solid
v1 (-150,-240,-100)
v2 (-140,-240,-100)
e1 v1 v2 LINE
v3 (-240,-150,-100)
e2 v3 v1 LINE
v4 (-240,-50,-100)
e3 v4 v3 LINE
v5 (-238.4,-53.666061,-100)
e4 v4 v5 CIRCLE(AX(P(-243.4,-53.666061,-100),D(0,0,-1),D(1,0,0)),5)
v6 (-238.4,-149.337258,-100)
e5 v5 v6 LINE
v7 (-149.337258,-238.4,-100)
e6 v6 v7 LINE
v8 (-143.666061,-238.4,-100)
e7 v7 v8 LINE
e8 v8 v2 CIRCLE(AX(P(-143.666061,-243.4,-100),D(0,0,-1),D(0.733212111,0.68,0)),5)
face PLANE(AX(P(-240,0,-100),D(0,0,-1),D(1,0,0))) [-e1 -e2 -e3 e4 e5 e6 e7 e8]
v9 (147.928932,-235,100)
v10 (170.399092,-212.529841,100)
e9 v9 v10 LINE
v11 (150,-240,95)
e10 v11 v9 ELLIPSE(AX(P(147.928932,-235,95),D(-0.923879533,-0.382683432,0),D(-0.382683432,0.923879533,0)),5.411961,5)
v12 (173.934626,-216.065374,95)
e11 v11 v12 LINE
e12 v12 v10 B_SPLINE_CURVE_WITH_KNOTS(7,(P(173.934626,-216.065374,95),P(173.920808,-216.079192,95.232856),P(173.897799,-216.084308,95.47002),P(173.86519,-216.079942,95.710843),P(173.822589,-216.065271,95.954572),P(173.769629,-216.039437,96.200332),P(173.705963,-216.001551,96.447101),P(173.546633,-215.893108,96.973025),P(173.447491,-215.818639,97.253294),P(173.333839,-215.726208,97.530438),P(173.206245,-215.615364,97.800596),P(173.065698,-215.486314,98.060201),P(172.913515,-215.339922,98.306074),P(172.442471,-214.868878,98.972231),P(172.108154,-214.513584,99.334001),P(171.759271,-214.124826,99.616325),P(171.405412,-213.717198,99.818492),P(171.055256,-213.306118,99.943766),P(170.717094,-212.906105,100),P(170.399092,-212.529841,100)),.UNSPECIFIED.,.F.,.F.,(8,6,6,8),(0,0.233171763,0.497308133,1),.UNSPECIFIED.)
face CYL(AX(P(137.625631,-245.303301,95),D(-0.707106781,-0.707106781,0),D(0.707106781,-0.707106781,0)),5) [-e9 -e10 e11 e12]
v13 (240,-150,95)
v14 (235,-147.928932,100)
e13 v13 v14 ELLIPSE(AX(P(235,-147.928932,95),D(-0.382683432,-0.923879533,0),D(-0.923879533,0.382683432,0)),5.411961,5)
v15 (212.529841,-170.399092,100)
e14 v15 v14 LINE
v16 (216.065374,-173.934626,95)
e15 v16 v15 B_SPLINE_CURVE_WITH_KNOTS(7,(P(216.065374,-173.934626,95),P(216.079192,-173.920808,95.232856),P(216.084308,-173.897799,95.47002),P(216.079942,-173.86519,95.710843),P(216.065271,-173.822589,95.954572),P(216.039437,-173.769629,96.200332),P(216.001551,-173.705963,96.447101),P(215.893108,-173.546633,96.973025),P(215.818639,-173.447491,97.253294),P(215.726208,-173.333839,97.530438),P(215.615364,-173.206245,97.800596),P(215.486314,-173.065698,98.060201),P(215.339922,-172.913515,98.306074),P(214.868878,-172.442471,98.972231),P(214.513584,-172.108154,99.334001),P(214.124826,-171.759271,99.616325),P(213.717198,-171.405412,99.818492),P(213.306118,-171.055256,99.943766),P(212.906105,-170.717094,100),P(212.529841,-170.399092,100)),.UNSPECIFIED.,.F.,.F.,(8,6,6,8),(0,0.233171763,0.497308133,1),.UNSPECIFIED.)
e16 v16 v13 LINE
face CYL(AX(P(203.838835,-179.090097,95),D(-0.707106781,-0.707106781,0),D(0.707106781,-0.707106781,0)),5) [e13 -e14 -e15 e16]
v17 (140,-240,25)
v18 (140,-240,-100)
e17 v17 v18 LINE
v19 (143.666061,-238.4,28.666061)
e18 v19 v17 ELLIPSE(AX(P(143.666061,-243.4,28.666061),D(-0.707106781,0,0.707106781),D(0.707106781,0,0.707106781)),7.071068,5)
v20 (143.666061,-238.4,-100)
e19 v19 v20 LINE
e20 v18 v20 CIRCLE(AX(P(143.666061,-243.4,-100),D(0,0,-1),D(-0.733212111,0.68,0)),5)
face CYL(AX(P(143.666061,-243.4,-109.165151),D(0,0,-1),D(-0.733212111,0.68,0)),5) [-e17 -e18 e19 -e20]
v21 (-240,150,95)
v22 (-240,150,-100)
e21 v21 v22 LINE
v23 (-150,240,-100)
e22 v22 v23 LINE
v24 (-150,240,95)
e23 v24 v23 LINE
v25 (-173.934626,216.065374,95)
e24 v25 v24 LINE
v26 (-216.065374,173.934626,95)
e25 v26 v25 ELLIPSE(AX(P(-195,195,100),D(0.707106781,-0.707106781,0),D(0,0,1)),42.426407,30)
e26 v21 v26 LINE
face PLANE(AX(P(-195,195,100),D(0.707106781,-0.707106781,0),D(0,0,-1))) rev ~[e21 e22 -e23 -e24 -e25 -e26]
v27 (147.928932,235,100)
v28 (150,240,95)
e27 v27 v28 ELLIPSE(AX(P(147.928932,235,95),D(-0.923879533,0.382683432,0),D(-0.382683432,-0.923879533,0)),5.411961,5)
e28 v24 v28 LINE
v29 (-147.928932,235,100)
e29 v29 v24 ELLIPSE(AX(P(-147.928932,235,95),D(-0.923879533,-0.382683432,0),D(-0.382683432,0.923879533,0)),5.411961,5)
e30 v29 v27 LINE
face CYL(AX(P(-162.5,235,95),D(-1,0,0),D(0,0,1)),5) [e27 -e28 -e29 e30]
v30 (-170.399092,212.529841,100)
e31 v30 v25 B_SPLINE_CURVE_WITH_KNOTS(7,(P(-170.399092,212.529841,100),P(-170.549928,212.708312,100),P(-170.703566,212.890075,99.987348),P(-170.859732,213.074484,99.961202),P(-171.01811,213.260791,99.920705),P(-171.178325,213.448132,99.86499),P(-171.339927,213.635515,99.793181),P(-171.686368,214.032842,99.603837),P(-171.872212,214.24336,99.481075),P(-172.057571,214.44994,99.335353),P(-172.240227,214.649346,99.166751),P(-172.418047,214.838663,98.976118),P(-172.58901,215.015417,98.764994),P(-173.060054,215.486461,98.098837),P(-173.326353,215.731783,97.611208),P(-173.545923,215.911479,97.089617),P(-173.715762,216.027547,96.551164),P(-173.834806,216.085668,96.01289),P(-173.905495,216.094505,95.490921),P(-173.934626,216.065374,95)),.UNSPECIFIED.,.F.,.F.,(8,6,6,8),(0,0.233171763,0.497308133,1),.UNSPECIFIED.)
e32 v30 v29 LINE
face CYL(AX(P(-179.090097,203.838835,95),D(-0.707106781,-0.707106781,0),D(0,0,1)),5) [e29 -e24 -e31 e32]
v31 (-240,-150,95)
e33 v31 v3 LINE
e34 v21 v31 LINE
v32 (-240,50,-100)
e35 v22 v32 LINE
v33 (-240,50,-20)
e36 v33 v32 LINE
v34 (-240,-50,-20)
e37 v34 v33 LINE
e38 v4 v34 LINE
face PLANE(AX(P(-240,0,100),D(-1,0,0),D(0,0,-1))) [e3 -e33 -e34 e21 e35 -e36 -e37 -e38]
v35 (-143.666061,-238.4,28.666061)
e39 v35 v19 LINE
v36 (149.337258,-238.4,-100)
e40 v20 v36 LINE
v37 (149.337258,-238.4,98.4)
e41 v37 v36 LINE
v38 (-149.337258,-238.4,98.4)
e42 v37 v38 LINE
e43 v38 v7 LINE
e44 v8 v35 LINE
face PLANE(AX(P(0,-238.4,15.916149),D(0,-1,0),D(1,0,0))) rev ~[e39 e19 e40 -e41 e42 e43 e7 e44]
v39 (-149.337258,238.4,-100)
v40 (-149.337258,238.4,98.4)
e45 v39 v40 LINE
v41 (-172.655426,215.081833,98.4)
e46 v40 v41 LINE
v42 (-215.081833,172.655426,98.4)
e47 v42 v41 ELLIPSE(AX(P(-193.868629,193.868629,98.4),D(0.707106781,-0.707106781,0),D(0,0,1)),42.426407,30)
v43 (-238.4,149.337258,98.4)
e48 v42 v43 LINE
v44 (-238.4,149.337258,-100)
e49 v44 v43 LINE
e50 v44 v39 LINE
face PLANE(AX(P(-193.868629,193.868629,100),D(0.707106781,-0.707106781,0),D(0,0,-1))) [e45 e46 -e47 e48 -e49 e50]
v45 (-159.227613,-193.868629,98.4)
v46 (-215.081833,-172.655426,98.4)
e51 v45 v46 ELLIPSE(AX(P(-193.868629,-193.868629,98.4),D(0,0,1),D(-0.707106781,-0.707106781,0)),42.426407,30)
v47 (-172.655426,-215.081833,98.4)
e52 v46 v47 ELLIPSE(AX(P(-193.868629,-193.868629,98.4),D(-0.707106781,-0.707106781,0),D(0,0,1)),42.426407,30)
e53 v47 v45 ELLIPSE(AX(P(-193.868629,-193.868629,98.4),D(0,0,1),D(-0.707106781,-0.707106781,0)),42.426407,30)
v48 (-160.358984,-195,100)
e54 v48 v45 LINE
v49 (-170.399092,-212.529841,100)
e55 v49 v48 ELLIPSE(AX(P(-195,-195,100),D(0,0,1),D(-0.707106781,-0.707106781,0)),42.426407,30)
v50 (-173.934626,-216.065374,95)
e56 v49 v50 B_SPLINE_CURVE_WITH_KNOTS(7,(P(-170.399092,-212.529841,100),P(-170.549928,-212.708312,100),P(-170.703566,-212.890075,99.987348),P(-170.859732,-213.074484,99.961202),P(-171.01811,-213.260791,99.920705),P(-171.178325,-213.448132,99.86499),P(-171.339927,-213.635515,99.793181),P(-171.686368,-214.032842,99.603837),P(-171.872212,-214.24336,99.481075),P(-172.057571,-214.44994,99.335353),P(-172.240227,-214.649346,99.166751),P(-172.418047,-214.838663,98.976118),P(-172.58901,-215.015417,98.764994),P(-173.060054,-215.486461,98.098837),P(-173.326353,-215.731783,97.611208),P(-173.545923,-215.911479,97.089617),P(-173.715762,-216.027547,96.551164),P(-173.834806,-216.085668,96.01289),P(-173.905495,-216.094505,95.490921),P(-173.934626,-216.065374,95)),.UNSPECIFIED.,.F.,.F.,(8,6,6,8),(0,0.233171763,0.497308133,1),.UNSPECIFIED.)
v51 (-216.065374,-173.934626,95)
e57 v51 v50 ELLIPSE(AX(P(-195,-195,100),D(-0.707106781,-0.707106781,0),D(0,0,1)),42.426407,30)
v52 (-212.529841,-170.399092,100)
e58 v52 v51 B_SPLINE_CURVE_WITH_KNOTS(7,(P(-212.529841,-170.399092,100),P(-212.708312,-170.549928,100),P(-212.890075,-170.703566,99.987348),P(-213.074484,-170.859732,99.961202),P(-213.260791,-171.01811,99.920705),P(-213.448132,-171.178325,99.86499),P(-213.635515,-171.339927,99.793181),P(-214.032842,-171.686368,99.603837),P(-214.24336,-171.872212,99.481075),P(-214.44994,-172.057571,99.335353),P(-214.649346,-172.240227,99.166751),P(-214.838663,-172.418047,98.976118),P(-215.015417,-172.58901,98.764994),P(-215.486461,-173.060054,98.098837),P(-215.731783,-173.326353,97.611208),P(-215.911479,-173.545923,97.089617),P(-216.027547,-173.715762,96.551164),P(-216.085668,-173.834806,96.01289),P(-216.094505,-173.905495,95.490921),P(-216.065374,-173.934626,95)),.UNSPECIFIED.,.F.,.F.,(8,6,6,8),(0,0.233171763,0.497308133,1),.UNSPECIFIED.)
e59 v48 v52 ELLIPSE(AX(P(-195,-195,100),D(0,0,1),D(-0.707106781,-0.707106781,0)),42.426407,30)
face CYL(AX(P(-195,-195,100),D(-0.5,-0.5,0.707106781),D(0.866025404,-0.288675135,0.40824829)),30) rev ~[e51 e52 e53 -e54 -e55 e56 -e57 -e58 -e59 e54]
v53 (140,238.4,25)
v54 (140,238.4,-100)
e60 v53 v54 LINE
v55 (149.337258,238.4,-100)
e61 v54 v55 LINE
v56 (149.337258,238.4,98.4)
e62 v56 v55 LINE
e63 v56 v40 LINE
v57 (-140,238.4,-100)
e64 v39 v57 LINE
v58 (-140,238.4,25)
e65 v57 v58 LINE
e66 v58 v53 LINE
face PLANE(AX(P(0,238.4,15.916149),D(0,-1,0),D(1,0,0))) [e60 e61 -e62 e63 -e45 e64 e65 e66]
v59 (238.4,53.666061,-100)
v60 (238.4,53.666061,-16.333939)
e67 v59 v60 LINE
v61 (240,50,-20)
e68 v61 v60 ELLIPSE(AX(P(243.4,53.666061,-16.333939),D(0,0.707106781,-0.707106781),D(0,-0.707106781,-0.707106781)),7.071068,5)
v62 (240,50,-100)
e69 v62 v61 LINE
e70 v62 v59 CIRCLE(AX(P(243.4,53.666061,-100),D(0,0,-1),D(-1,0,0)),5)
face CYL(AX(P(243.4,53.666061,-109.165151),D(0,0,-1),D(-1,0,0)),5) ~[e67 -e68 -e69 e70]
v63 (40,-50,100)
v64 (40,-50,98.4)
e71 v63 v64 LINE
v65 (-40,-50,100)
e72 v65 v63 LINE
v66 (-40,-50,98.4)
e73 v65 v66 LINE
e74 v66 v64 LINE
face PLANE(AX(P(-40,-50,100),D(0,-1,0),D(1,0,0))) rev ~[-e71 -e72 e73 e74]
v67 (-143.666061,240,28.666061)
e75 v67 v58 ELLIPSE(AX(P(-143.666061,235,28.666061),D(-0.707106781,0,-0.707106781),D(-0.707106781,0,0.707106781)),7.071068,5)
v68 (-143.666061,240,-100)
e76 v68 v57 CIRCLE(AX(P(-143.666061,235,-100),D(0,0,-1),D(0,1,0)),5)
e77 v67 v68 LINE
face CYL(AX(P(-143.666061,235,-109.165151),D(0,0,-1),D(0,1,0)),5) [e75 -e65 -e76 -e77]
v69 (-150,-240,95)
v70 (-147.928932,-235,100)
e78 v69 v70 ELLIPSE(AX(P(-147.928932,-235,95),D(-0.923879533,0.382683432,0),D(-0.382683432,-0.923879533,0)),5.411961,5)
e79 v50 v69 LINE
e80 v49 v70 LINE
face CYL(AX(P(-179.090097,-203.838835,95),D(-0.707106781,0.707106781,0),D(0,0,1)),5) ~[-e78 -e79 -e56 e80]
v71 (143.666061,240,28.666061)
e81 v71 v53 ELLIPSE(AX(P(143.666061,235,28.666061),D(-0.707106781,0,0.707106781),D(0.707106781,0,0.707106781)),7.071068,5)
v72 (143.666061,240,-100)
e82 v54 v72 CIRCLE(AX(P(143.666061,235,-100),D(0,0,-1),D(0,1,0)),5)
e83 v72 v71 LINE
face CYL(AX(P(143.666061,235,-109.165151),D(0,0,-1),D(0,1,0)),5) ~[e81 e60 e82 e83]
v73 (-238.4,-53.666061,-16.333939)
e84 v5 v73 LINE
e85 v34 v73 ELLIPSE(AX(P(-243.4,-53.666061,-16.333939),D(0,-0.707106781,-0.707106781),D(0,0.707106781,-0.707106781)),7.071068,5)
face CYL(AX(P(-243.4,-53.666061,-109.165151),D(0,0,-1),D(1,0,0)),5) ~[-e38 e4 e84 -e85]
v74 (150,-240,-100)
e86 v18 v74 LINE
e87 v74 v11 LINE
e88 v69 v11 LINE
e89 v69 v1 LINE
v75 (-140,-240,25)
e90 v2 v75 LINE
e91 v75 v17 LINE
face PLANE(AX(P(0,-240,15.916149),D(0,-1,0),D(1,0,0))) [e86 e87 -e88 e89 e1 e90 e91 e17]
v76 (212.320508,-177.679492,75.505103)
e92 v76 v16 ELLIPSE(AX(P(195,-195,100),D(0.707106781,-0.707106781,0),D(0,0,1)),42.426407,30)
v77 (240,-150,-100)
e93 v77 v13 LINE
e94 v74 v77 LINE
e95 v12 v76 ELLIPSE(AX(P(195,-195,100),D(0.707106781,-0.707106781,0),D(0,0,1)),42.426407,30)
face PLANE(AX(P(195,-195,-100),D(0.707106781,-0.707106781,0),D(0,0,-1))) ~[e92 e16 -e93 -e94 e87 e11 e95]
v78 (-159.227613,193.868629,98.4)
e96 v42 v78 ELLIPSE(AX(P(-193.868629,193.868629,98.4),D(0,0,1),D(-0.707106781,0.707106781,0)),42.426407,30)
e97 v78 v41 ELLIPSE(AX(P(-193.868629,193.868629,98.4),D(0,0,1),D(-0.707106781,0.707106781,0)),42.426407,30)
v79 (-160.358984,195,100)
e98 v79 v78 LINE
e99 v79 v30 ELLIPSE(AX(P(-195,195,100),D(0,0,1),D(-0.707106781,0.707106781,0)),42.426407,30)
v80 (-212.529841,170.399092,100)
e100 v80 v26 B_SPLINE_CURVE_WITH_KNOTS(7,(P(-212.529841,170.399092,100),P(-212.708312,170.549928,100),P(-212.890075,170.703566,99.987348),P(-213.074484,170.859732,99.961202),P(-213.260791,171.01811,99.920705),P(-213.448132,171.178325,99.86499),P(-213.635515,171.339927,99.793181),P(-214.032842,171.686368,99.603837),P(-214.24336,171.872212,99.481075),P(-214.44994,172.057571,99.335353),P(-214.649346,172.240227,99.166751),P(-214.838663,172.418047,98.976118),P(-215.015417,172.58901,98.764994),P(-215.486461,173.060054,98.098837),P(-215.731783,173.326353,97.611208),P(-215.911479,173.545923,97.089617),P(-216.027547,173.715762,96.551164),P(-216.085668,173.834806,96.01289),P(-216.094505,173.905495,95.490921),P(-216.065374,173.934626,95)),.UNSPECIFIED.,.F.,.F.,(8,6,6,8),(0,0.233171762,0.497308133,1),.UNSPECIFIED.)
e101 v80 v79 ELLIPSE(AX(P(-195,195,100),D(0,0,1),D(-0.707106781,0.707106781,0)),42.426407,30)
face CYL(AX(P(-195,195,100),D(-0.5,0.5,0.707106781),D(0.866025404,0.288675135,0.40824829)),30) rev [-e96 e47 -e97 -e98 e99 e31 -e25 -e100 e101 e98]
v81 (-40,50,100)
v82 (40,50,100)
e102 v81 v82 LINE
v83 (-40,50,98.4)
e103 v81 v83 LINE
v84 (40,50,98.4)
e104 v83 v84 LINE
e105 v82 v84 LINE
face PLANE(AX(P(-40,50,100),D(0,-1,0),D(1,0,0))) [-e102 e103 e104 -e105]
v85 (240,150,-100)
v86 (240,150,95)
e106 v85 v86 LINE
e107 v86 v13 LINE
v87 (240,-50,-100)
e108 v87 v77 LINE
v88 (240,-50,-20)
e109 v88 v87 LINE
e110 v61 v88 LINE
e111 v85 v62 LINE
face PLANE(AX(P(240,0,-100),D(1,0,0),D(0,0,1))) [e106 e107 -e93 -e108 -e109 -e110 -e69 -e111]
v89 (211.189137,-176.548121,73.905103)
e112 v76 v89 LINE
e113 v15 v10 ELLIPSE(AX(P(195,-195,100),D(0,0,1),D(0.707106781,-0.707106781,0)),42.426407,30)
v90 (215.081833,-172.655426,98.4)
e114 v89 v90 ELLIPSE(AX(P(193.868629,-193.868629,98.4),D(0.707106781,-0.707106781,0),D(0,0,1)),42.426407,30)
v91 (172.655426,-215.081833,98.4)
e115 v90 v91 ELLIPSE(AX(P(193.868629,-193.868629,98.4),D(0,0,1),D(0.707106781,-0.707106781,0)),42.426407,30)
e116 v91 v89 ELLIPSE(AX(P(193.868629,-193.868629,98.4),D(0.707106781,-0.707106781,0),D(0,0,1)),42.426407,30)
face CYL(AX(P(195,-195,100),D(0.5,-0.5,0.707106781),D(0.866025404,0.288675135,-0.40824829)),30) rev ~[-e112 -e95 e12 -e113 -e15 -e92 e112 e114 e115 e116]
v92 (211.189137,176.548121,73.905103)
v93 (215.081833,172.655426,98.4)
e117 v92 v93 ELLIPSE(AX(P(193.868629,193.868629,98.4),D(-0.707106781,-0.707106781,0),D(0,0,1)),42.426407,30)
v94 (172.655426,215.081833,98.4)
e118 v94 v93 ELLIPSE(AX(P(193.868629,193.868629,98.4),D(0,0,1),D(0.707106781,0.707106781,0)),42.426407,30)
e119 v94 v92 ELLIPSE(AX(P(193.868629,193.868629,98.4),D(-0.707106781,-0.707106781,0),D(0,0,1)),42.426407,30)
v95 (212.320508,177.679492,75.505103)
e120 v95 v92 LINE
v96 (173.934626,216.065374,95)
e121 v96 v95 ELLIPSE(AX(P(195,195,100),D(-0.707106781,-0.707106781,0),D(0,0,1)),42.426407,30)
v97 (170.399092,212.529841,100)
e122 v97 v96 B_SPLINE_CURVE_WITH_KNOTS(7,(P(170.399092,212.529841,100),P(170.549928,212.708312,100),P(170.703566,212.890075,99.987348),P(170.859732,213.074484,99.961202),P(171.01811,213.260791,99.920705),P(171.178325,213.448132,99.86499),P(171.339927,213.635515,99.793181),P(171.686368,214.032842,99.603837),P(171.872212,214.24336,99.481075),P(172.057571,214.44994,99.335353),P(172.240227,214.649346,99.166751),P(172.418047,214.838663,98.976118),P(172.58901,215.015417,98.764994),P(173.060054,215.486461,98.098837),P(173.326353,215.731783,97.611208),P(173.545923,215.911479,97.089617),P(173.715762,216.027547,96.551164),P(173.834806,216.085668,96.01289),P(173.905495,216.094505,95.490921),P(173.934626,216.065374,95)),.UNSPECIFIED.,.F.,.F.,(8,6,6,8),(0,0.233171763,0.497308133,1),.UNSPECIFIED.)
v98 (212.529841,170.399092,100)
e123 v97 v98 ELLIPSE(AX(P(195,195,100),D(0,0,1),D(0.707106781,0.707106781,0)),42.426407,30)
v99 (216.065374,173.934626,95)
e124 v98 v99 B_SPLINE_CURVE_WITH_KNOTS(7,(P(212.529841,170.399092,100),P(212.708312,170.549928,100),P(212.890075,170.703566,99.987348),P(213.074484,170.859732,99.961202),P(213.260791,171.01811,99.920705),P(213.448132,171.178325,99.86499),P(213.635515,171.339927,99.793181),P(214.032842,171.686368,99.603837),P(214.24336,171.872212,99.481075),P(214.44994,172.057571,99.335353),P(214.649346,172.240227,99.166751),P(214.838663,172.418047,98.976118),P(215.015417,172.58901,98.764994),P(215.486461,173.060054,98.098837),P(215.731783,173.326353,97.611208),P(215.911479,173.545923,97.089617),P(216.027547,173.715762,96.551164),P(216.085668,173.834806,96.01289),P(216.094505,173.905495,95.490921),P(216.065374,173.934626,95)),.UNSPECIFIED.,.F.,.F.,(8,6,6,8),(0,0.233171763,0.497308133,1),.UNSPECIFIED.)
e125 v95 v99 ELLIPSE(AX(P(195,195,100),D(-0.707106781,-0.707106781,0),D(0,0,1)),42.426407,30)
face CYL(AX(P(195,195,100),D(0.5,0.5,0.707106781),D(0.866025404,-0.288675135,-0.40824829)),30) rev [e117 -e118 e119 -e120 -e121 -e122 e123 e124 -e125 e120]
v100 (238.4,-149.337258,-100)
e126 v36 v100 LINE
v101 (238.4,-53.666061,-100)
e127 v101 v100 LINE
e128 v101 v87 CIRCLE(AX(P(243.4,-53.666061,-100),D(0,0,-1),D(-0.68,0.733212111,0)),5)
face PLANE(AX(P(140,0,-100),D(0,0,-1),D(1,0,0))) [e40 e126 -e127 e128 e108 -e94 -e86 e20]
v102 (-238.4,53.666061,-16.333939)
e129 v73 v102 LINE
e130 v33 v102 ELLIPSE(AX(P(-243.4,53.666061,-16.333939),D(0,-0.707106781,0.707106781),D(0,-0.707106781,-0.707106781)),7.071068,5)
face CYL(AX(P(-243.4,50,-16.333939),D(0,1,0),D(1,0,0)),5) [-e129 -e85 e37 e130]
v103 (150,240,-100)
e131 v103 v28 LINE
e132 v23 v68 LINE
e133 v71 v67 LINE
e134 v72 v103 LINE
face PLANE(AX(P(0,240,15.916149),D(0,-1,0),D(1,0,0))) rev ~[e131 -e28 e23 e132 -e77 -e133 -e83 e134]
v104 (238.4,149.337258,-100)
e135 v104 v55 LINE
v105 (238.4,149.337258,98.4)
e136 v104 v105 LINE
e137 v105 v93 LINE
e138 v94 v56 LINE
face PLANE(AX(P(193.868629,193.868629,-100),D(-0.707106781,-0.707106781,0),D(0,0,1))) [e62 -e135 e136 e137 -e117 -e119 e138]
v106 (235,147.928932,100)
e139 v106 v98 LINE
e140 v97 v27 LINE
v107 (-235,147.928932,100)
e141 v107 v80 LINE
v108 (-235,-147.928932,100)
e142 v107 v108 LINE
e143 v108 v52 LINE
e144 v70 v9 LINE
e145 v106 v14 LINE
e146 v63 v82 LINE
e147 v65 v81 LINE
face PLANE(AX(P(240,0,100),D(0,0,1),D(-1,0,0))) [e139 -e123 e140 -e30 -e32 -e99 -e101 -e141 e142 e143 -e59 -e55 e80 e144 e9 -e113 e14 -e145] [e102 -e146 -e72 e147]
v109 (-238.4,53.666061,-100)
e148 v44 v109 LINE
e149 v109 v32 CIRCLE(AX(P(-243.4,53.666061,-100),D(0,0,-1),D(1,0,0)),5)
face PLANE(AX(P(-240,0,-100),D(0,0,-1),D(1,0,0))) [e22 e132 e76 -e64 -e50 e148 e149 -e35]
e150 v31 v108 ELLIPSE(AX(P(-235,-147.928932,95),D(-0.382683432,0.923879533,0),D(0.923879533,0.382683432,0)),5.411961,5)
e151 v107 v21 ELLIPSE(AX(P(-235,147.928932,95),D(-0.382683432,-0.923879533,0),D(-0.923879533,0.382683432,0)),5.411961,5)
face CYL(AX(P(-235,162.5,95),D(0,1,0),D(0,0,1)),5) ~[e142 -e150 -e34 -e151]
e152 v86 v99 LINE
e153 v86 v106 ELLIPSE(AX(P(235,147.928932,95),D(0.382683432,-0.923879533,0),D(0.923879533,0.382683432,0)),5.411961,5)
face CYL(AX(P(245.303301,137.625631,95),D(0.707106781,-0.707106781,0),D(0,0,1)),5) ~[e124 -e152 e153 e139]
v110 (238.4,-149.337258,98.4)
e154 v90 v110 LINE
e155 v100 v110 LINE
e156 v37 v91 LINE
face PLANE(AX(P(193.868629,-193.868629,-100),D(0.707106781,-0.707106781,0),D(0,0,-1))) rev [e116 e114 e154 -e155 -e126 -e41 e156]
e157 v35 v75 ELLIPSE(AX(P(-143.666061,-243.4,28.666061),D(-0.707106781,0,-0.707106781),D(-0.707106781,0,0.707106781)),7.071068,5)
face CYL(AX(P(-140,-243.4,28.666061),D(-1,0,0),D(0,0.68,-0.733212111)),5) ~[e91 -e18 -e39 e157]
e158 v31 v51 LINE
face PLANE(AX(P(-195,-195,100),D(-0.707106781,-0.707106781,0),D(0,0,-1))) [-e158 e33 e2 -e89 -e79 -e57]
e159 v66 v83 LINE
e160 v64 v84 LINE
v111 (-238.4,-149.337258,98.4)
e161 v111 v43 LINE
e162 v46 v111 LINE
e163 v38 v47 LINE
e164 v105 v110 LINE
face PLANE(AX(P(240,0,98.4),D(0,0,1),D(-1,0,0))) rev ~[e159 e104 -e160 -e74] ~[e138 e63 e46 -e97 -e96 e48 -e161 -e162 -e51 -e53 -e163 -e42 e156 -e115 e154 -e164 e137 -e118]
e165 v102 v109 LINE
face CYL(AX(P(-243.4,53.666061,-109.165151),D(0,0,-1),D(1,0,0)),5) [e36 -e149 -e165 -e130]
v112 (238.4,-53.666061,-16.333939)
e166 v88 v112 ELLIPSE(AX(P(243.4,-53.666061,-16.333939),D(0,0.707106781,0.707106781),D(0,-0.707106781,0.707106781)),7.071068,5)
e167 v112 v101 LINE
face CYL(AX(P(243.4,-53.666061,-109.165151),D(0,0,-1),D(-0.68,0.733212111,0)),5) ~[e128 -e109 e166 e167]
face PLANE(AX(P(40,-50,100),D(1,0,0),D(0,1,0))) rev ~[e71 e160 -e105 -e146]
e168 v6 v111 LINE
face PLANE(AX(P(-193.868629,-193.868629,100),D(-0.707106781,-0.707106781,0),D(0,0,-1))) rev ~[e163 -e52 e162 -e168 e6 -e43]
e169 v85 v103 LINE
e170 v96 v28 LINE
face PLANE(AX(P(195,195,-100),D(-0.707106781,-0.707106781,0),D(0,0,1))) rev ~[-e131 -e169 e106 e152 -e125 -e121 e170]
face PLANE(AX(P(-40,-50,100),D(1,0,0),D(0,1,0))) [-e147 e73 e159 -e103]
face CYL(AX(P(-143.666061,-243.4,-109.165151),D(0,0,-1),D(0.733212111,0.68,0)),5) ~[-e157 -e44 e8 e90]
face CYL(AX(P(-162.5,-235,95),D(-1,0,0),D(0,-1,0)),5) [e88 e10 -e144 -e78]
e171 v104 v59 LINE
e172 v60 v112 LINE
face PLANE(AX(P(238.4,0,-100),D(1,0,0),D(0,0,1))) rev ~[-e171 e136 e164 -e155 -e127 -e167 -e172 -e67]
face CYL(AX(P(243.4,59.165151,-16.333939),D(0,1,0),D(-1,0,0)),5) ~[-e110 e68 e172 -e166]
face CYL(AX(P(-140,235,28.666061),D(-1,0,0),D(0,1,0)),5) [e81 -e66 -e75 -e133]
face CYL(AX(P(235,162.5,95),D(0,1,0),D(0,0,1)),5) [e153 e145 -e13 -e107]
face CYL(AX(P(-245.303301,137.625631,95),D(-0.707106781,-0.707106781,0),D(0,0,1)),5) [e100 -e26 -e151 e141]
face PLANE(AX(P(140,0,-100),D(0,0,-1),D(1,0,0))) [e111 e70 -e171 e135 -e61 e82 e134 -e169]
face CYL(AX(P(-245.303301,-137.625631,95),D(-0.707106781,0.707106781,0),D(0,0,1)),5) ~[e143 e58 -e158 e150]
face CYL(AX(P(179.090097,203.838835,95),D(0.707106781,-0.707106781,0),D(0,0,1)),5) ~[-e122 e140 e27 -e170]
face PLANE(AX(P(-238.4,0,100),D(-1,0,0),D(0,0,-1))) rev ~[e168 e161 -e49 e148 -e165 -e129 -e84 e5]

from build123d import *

# Parameters (mm, degrees)
F1_DEPTH       = 240
F2_SIZE        = 90
F3_T           = -1.6
F10_R          = 30
F12_DEPTH      = 78
F11_R          = 30
F13_DEPTH      = 82
F8_R           = 30
F14_DEPTH      = 153
F9_R           = 30
F15_DEPTH      = 141
F17_DEPTH      = 688
F18_W          = 80
F18_H          = 100
F19_DEPTH      = 25
F20_T1_DEPTH   = 325
F20_T3_DEPTH   = 58.6396103068
F20_T5_DEPTH   = 58.6396103068
F20_T7_DEPTH   = 58.6396103068
F20_T9_DEPTH   = 58.6396103068
F20_T11_DEPTH  = 325
F20_T13_DEPTH  = 58.6396103068
F20_T15_DEPTH  = 58.6396103068
F20_T17_DEPTH  = 134.1651513899
F20_T19_DEPTH  = 280
F20_T21_DEPTH  = 89.1651513899
F20_T23_DEPTH  = 100
F20_T29_DEPTH  = 134.1651513899
F20_T33_DEPTH  = 289.1651513899
F20_T40_DEPTH  = 289.1651513899
F20_T44_DEPTH  = 134.1651513899
F20_T51_DEPTH  = 89.1651513899
F20_T55_DEPTH  = 109.1651513899
F20_T62_DEPTH  = 109.1651513899
F20_T66_DEPTH  = 89.1651513899
F20_T73_DEPTH  = 89.1651513899
F20_T77_DEPTH  = 109.1651513899
F20_T84_DEPTH  = 89.1651513899
F20_T88_DEPTH  = 109.1651513899
F20_T95_DEPTH  = 289.1651513899
F20_T99_DEPTH  = 134.1651513899
F20_T106_DEPTH = 134.1651513899
F20_T110_DEPTH = 289.1651513899


# Not quite as in the source:
# - a fillet or chamfer that OpenCascade refuses, or shapes differently, is made with other operations: its cross-section is extruded or revolved along the edge and cut away or added


with BuildPart() as f1:
    # F0 (on Front) → F1 (new body, symmetric)
    with BuildSketch(Plane.XZ):
        Polygon((140, -100), (240, -100), (240, 100), (-240, 100), (-240, -100), (-140, -100), (-140, 25), (140, 25), align=None)
    extrude(amount=F1_DEPTH, both=True)

    # F2
    f2_edges = [f1.edges().sort_by_distance(p)[0] for p in [
        (240, -240, 0),
        (240, 240, 0),
        (-240, 240, 0),
        (-240, -240, 0),
    ]]
    chamfer(f2_edges, length=F2_SIZE)

    # F3
    f3_openings = [f1.faces().sort_by_distance(p)[0] for p in [
        (185.93985, 0, -100),
        (-185.93985, 0, -100),
        (0, 0, 25),
        (140, 0, -37.5),
        (-140, 0, -37.5),
    ]]
    offset(amount=F3_T, openings=f3_openings)

    # F10 (on face) → F12 (cut)
    with BuildSketch(Plane(origin=(-132.8553390593, 132.8553390593, 187.8858223314), x_dir=(0.8660254038, 0.2886751346, 0.4082482905), z_dir=(0.5, -0.5, -0.7071067812))):
        with Locations((-71.7584734456, -101.4818063619)):
            Circle(F10_R)
    extrude(amount=F12_DEPTH, mode=Mode.SUBTRACT)

    # F11 (on face) → F13 (cut)
    with BuildSketch(Plane(origin=(-132.8553390593, -132.8553390593, 187.8858223314), x_dir=(0.8660254038, -0.2886751346, 0.4082482905), z_dir=(-0.5, -0.5, 0.7071067812))):
        with Locations((-71.7584734456, -101.4818063619)):
            Circle(F11_R)
    extrude(amount=-F13_DEPTH, mode=Mode.SUBTRACT)

    # F8 (on face) → F14 (cut)
    with BuildSketch(Plane(origin=(132.8553390593, -132.8553390593, 187.8858223314), x_dir=(0.8660254038, 0.2886751346, -0.4082482905), z_dir=(0.5, -0.5, 0.7071067812))):
        with Locations((71.7584734456, -101.4818063619)):
            Circle(F8_R)
    extrude(amount=-F14_DEPTH, mode=Mode.SUBTRACT)

    # F9 (on face) → F15 (cut)
    with BuildSketch(Plane(origin=(132.8553390593, 132.8553390593, 187.8858223314), x_dir=(0.8660254038, -0.2886751346, -0.4082482905), z_dir=(-0.5, -0.5, -0.7071067812))):
        with Locations((71.7584734456, -101.4818063619)):
            Circle(F9_R)
    extrude(amount=F15_DEPTH, mode=Mode.SUBTRACT)

    # F16 (on face) → F17 (cut)
    with BuildSketch(Plane(origin=(-240, 0, 0), x_dir=(0, -1, 0), z_dir=(-1, 0, 0))):
        Polygon((-50, -20), (-50, -100), (0, -100), (50, -100), (50, -20), align=None)
    extrude(amount=-F17_DEPTH, mode=Mode.SUBTRACT)

    # F18 (on face) → F19 (cut)
    with BuildSketch(Plane.XY.offset(100)):
        Rectangle(F18_W, F18_H)
    extrude(amount=-F19_DEPTH, mode=Mode.SUBTRACT)

    # F20: fillet of radius 5 on 24 edges, made by hand

    # F20_s2 → F20_t1 (cut)
    with BuildSketch(Plane.YZ.offset(-162.5)):
        with BuildLine():
            ThreePointArc((235, 100), (238.5355339059, 98.5355339059), (240, 95))
            Line((240, 95), (240, 100))
            Line((240, 100), (235, 100))
        make_face()
        with BuildLine():
            ThreePointArc((-240, 95), (-238.5355339059, 98.5355339059), (-235, 100))
            Line((-235, 100), (-240, 100))
            Line((-240, 100), (-240, 95))
        make_face()
    extrude(amount=F20_T1_DEPTH, mode=Mode.SUBTRACT)

    # F20_s4 → F20_t3 (cut)
    with BuildSketch(Plane(origin=(12.3743686708, 12.3743686708, 0), x_dir=(0, 0, 1), z_dir=(0.7071067812, 0.7071067812, 0))):
        with BuildLine():
            ThreePointArc((100, -270.7716446628), (98.5355339059, -274.3071785687), (95, -275.7716446628))
            Line((95, -275.7716446628), (100, -275.7716446628))
            Line((100, -275.7716446628), (100, -270.7716446628))
        make_face()
        with BuildLine():
            ThreePointArc((95, 275.7716446628), (98.5355339059, 274.3071785687), (100, 270.7716446628))
            Line((100, 270.7716446628), (100, 275.7716446628))
            Line((100, 275.7716446628), (95, 275.7716446628))
        make_face()
    extrude(amount=F20_T3_DEPTH, mode=Mode.SUBTRACT)

    # F20_s6 → F20_t5 (cut)
    with BuildSketch(Plane(origin=(-12.3743686708, 12.3743686708, 0), x_dir=(0, 0, 1), z_dir=(-0.7071067812, 0.7071067812, 0))):
        with BuildLine():
            ThreePointArc((100, 270.7716446628), (98.5355339059, 274.3071785687), (95, 275.7716446628))
            Line((95, 275.7716446628), (100, 275.7716446628))
            Line((100, 275.7716446628), (100, 270.7716446628))
        make_face()
    extrude(amount=F20_T5_DEPTH, mode=Mode.SUBTRACT)

    # F20_s8 → F20_t7 (cut)
    with BuildSketch(Plane(origin=(53.8388347648, -53.8388347648, 0), x_dir=(0, 0, 1), z_dir=(-0.7071067812, 0.7071067812, 0))):
        with BuildLine():
            ThreePointArc((100, 270.7716446628), (98.5355339059, 274.3071785687), (95, 275.7716446628))
            Line((95, 275.7716446628), (100, 275.7716446628))
            Line((100, 275.7716446628), (100, 270.7716446628))
        make_face()
    extrude(amount=F20_T7_DEPTH, mode=Mode.SUBTRACT)

    # F20_s10 → F20_t9 (cut)
    with BuildSketch(Plane(origin=(-53.8388347648, -53.8388347648, 0), x_dir=(0, 0, 1), z_dir=(0.7071067812, 0.7071067812, 0))):
        with BuildLine():
            ThreePointArc((100, -270.7716446628), (98.5355339059, -274.3071785687), (95, -275.7716446628))
            Line((95, -275.7716446628), (100, -275.7716446628))
            Line((100, -275.7716446628), (100, -270.7716446628))
        make_face()
        with BuildLine():
            ThreePointArc((95, 275.7716446628), (98.5355339059, 274.3071785687), (100, 270.7716446628))
            Line((100, 270.7716446628), (100, 275.7716446628))
            Line((100, 275.7716446628), (95, 275.7716446628))
        make_face()
    extrude(amount=F20_T9_DEPTH, mode=Mode.SUBTRACT)

    # F20_s12 → F20_t11 (cut)
    with BuildSketch(Plane.XZ.offset(-162.5)):
        with BuildLine():
            ThreePointArc((-235, 100), (-238.5355339059, 98.5355339059), (-240, 95))
            Line((-240, 95), (-240, 100))
            Line((-240, 100), (-235, 100))
        make_face()
        with BuildLine():
            ThreePointArc((235, 100), (238.5355339059, 98.5355339059), (240, 95))
            Line((240, 95), (240, 100))
            Line((240, 100), (235, 100))
        make_face()
    extrude(amount=F20_T11_DEPTH, mode=Mode.SUBTRACT)

    # F20_s14 → F20_t13 (cut)
    with BuildSketch(Plane(origin=(-53.8388347648, 53.8388347648, 0), x_dir=(0, 0, 1), z_dir=(0.7071067812, -0.7071067812, 0))):
        with BuildLine():
            ThreePointArc((100, 270.7716446628), (98.5355339059, 274.3071785687), (95, 275.7716446628))
            Line((95, 275.7716446628), (100, 275.7716446628))
            Line((100, 275.7716446628), (100, 270.7716446628))
        make_face()
    extrude(amount=F20_T13_DEPTH, mode=Mode.SUBTRACT)

    # F20_s16 → F20_t15 (cut)
    with BuildSketch(Plane(origin=(12.3743686708, -12.3743686708, 0), x_dir=(0, 0, 1), z_dir=(0.7071067812, -0.7071067812, 0))):
        with BuildLine():
            ThreePointArc((100, 270.7716446628), (98.5355339059, 274.3071785687), (95, 275.7716446628))
            Line((95, 275.7716446628), (100, 275.7716446628))
            Line((100, 275.7716446628), (100, 270.7716446628))
        make_face()
    extrude(amount=F20_T15_DEPTH, mode=Mode.SUBTRACT)

    # F20_s18 → F20_t17 (cut)
    with BuildSketch(Plane.XY.offset(-109.1651513899)):
        with BuildLine():
            ThreePointArc((140, -240), (141.666060556, -238.817424305), (143.666060556, -238.4))
            Line((143.666060556, -238.4), (140, -238.4))
            Line((140, -238.4), (140, -240))
        make_face()
        with BuildLine():
            ThreePointArc((-140, -240), (-141.666060556, -238.817424305), (-143.666060556, -238.4))
            Line((-143.666060556, -238.4), (-140, -238.4))
            Line((-140, -238.4), (-140, -240))
        make_face()
        with BuildLine():
            ThreePointArc((143.666060556, 240), (141.666060556, 239.582575695), (140, 238.4))
            Line((140, 238.4), (140, 240))
            Line((140, 240), (143.666060556, 240))
        make_face()
        with BuildLine():
            ThreePointArc((-143.666060556, 240), (-141.666060556, 239.582575695), (-140, 238.4))
            Line((-140, 238.4), (-140, 240))
            Line((-140, 240), (-143.666060556, 240))
        make_face()
    extrude(amount=F20_T17_DEPTH, mode=Mode.SUBTRACT)

    # F20_s20 → F20_t19 (cut)
    with BuildSketch(Plane.YZ.offset(-140)):
        with BuildLine():
            ThreePointArc((-240, 25), (-238.817424305, 26.666060556), (-238.4, 28.666060556))
            Line((-238.4, 28.666060556), (-238.4, 25))
            Line((-238.4, 25), (-240, 25))
        make_face()
        with BuildLine():
            ThreePointArc((240, 28.666060556), (239.582575695, 26.666060556), (238.4, 25))
            Line((238.4, 25), (240, 25))
            Line((240, 25), (240, 28.666060556))
        make_face()
    extrude(amount=F20_T19_DEPTH, mode=Mode.SUBTRACT)

    # F20_s22 → F20_t21 (cut)
    with BuildSketch(Plane.XY.offset(-109.1651513899)):
        with BuildLine():
            ThreePointArc((-238.4, -53.666060556), (-238.817424305, -51.666060556), (-240, -50))
            Line((-240, -50), (-238.4, -50))
            Line((-238.4, -50), (-238.4, -53.666060556))
        make_face()
        with BuildLine():
            ThreePointArc((-238.4, 53.666060556), (-238.817424305, 51.666060556), (-240, 50))
            Line((-240, 50), (-238.4, 50))
            Line((-238.4, 50), (-238.4, 53.666060556))
        make_face()
        with BuildLine():
            ThreePointArc((240, -50), (238.817424305, -51.666060556), (238.4, -53.666060556))
            Line((238.4, -53.666060556), (238.4, -50))
            Line((238.4, -50), (240, -50))
        make_face()
        with BuildLine():
            ThreePointArc((238.4, 53.666060556), (238.817424305, 51.666060556), (240, 50))
            Line((240, 50), (238.4, 50))
            Line((238.4, 50), (238.4, 53.666060556))
        make_face()
    extrude(amount=F20_T21_DEPTH, mode=Mode.SUBTRACT)

    # F20_s24 → F20_t23 (cut)
    with BuildSketch(Plane.XZ.offset(-50)):
        with BuildLine():
            ThreePointArc((-238.4, -16.333939444), (-238.817424305, -18.333939444), (-240, -20))
            Line((-240, -20), (-238.4, -20))
            Line((-238.4, -20), (-238.4, -16.333939444))
        make_face()
        with BuildLine():
            ThreePointArc((238.4, -16.333939444), (238.817424305, -18.333939444), (240, -20))
            Line((240, -20), (238.4, -20))
            Line((238.4, -20), (238.4, -16.333939444))
        make_face()
    extrude(amount=F20_T23_DEPTH, mode=Mode.SUBTRACT)


with BuildPart() as f20_tool27:
    # F20_s28 → F20_t29 (new body)
    with BuildSketch(Plane.XY.offset(34.1651513899)):
        with BuildLine():
            ThreePointArc((140, -240), (141.666060556, -238.817424305), (143.666060556, -238.4))
            Line((143.666060556, -238.4), (140, -238.4))
            Line((140, -238.4), (140, -240))
        make_face()
    extrude(amount=-F20_T29_DEPTH)

    split(bisect_by=Plane.XY.offset(25), keep=Keep.TOP)


with BuildPart() as f20_tool31:
    # F20_s32 → F20_t33 (new body)
    with BuildSketch(Plane.YZ.offset(-140)):
        with BuildLine():
            ThreePointArc((-240, 25), (-238.817424305, 26.666060556), (-238.4, 28.666060556))
            Line((-238.4, 28.666060556), (-238.4, 25))
            Line((-238.4, 25), (-240, 25))
        make_face()
    extrude(amount=F20_T33_DEPTH)

    split(bisect_by=Plane.YZ.offset(140), keep=Keep.TOP)


with BuildPart() as f20_tool27_1:
    add(f20_tool27.part)

    # F20_t35: intersect F20_tool31
    add(f20_tool31.part, mode=Mode.INTERSECT)


with BuildPart() as f1_1:
    add(f1.part)

    # F20_t25: cut F20_tool27
    add(f20_tool27_1.part, mode=Mode.SUBTRACT)


with BuildPart() as f20_tool38:
    # F20_s39 → F20_t40 (new body)
    with BuildSketch(Plane.YZ.offset(-149.1651513899)):
        with BuildLine():
            ThreePointArc((-240, 25), (-238.817424305, 26.666060556), (-238.4, 28.666060556))
            Line((-238.4, 28.666060556), (-238.4, 25))
            Line((-238.4, 25), (-240, 25))
        make_face()
    extrude(amount=F20_T40_DEPTH)

    split(bisect_by=Plane.YZ.offset(-140), keep=Keep.BOTTOM)


with BuildPart() as f20_tool42:
    # F20_s43 → F20_t44 (new body)
    with BuildSketch(Plane.XY.offset(-100)):
        with BuildLine():
            ThreePointArc((-140, -240), (-141.666060556, -238.817424305), (-143.666060556, -238.4))
            Line((-143.666060556, -238.4), (-140, -238.4))
            Line((-140, -238.4), (-140, -240))
        make_face()
    extrude(amount=F20_T44_DEPTH)

    split(bisect_by=Plane.XY.offset(25), keep=Keep.TOP)


with BuildPart() as f20_tool38_1:
    add(f20_tool38.part)

    # F20_t46: intersect F20_tool42
    add(f20_tool42.part, mode=Mode.INTERSECT)


with BuildPart() as f1_2:
    add(f1_1.part)

    # F20_t36: cut F20_tool38
    add(f20_tool38_1.part, mode=Mode.SUBTRACT)


with BuildPart() as f20_tool49:
    # F20_s50 → F20_t51 (new body)
    with BuildSketch(Plane.XY.offset(-100)):
        with BuildLine():
            ThreePointArc((-238.4, -53.666060556), (-238.817424305, -51.666060556), (-240, -50))
            Line((-240, -50), (-238.4, -50))
            Line((-238.4, -50), (-238.4, -53.666060556))
        make_face()
    extrude(amount=F20_T51_DEPTH)

    split(bisect_by=Plane.XY.offset(-20), keep=Keep.TOP)


with BuildPart() as f20_tool53:
    # F20_s54 → F20_t55 (new body)
    with BuildSketch(Plane.XZ.offset(59.1651513899)):
        with BuildLine():
            ThreePointArc((-238.4, -16.333939444), (-238.817424305, -18.333939444), (-240, -20))
            Line((-240, -20), (-238.4, -20))
            Line((-238.4, -20), (-238.4, -16.333939444))
        make_face()
    extrude(amount=-F20_T55_DEPTH)

    split(bisect_by=Plane.XZ.offset(50), keep=Keep.TOP)


with BuildPart() as f20_tool49_1:
    add(f20_tool49.part)

    # F20_t57: intersect F20_tool53
    add(f20_tool53.part, mode=Mode.INTERSECT)


with BuildPart() as f1_3:
    add(f1_2.part)

    # F20_t47: cut F20_tool49
    add(f20_tool49_1.part, mode=Mode.SUBTRACT)


with BuildPart() as f20_tool60:
    # F20_s61 → F20_t62 (new body)
    with BuildSketch(Plane.XZ.offset(50)):
        with BuildLine():
            ThreePointArc((-238.4, -16.333939444), (-238.817424305, -18.333939444), (-240, -20))
            Line((-240, -20), (-238.4, -20))
            Line((-238.4, -20), (-238.4, -16.333939444))
        make_face()
    extrude(amount=-F20_T62_DEPTH)

    split(bisect_by=Plane.XZ.offset(-50), keep=Keep.BOTTOM)


with BuildPart() as f20_tool64:
    # F20_s65 → F20_t66 (new body)
    with BuildSketch(Plane.XY.offset(-10.8348486101)):
        with BuildLine():
            ThreePointArc((-238.4, 53.666060556), (-238.817424305, 51.666060556), (-240, 50))
            Line((-240, 50), (-238.4, 50))
            Line((-238.4, 50), (-238.4, 53.666060556))
        make_face()
    extrude(amount=-F20_T66_DEPTH)

    split(bisect_by=Plane.XY.offset(-20), keep=Keep.TOP)


with BuildPart() as f20_tool60_1:
    add(f20_tool60.part)

    # F20_t68: intersect F20_tool64
    add(f20_tool64.part, mode=Mode.INTERSECT)


with BuildPart() as f1_4:
    add(f1_3.part)

    # F20_t58: cut F20_tool60
    add(f20_tool60_1.part, mode=Mode.SUBTRACT)


with BuildPart() as f20_tool71:
    # F20_s72 → F20_t73 (new body)
    with BuildSketch(Plane.XY.offset(-10.8348486101)):
        with BuildLine():
            ThreePointArc((240, -50), (238.817424305, -51.666060556), (238.4, -53.666060556))
            Line((238.4, -53.666060556), (238.4, -50))
            Line((238.4, -50), (240, -50))
        make_face()
    extrude(amount=-F20_T73_DEPTH)

    split(bisect_by=Plane.XY.offset(-20), keep=Keep.TOP)


with BuildPart() as f20_tool75:
    # F20_s76 → F20_t77 (new body)
    with BuildSketch(Plane.XZ.offset(-50)):
        with BuildLine():
            ThreePointArc((238.4, -16.333939444), (238.817424305, -18.333939444), (240, -20))
            Line((240, -20), (238.4, -20))
            Line((238.4, -20), (238.4, -16.333939444))
        make_face()
    extrude(amount=F20_T77_DEPTH)

    split(bisect_by=Plane.XZ.offset(50), keep=Keep.TOP)


with BuildPart() as f20_tool71_1:
    add(f20_tool71.part)

    # F20_t79: intersect F20_tool75
    add(f20_tool75.part, mode=Mode.INTERSECT)


with BuildPart() as f1_5:
    add(f1_4.part)

    # F20_t69: cut F20_tool71
    add(f20_tool71_1.part, mode=Mode.SUBTRACT)


with BuildPart() as f20_tool82:
    # F20_s83 → F20_t84 (new body)
    with BuildSketch(Plane.XY.offset(-100)):
        with BuildLine():
            ThreePointArc((238.4, 53.666060556), (238.817424305, 51.666060556), (240, 50))
            Line((240, 50), (238.4, 50))
            Line((238.4, 50), (238.4, 53.666060556))
        make_face()
    extrude(amount=F20_T84_DEPTH)

    split(bisect_by=Plane.XY.offset(-20), keep=Keep.TOP)


with BuildPart() as f20_tool86:
    # F20_s87 → F20_t88 (new body)
    with BuildSketch(Plane.XZ.offset(-59.1651513899)):
        with BuildLine():
            ThreePointArc((238.4, -16.333939444), (238.817424305, -18.333939444), (240, -20))
            Line((240, -20), (238.4, -20))
            Line((238.4, -20), (238.4, -16.333939444))
        make_face()
    extrude(amount=F20_T88_DEPTH)

    split(bisect_by=Plane.XZ.offset(-50), keep=Keep.BOTTOM)


with BuildPart() as f20_tool82_1:
    add(f20_tool82.part)

    # F20_t90: intersect F20_tool86
    add(f20_tool86.part, mode=Mode.INTERSECT)


with BuildPart() as f1_6:
    add(f1_5.part)

    # F20_t80: cut F20_tool82
    add(f20_tool82_1.part, mode=Mode.SUBTRACT)


with BuildPart() as f20_tool93:
    # F20_s94 → F20_t95 (new body)
    with BuildSketch(Plane.YZ.offset(-149.1651513899)):
        with BuildLine():
            ThreePointArc((240, 28.666060556), (239.582575695, 26.666060556), (238.4, 25))
            Line((238.4, 25), (240, 25))
            Line((240, 25), (240, 28.666060556))
        make_face()
    extrude(amount=F20_T95_DEPTH)

    split(bisect_by=Plane.YZ.offset(-140), keep=Keep.BOTTOM)


with BuildPart() as f20_tool97:
    # F20_s98 → F20_t99 (new body)
    with BuildSketch(Plane.XY.offset(-100)):
        with BuildLine():
            ThreePointArc((-143.666060556, 240), (-141.666060556, 239.582575695), (-140, 238.4))
            Line((-140, 238.4), (-140, 240))
            Line((-140, 240), (-143.666060556, 240))
        make_face()
    extrude(amount=F20_T99_DEPTH)

    split(bisect_by=Plane.XY.offset(25), keep=Keep.TOP)


with BuildPart() as f20_tool93_1:
    add(f20_tool93.part)

    # F20_t101: intersect F20_tool97
    add(f20_tool97.part, mode=Mode.INTERSECT)


with BuildPart() as f1_7:
    add(f1_6.part)

    # F20_t91: cut F20_tool93
    add(f20_tool93_1.part, mode=Mode.SUBTRACT)


with BuildPart() as f20_tool104:
    # F20_s105 → F20_t106 (new body)
    with BuildSketch(Plane.XY.offset(34.1651513899)):
        with BuildLine():
            ThreePointArc((143.666060556, 240), (141.666060556, 239.582575695), (140, 238.4))
            Line((140, 238.4), (140, 240))
            Line((140, 240), (143.666060556, 240))
        make_face()
    extrude(amount=-F20_T106_DEPTH)

    split(bisect_by=Plane.XY.offset(25), keep=Keep.TOP)


with BuildPart() as f20_tool108:
    # F20_s109 → F20_t110 (new body)
    with BuildSketch(Plane.YZ.offset(-140)):
        with BuildLine():
            ThreePointArc((240, 28.666060556), (239.582575695, 26.666060556), (238.4, 25))
            Line((238.4, 25), (240, 25))
            Line((240, 25), (240, 28.666060556))
        make_face()
    extrude(amount=F20_T110_DEPTH)

    split(bisect_by=Plane.YZ.offset(140), keep=Keep.TOP)


with BuildPart() as f20_tool104_1:
    add(f20_tool104.part)

    # F20_t112: intersect F20_tool108
    add(f20_tool108.part, mode=Mode.INTERSECT)


with BuildPart() as f1_8:
    add(f1_7.part)

    # F20_t102: cut F20_tool104
    add(f20_tool104_1.part, mode=Mode.SUBTRACT)


solid = f1_8.part
